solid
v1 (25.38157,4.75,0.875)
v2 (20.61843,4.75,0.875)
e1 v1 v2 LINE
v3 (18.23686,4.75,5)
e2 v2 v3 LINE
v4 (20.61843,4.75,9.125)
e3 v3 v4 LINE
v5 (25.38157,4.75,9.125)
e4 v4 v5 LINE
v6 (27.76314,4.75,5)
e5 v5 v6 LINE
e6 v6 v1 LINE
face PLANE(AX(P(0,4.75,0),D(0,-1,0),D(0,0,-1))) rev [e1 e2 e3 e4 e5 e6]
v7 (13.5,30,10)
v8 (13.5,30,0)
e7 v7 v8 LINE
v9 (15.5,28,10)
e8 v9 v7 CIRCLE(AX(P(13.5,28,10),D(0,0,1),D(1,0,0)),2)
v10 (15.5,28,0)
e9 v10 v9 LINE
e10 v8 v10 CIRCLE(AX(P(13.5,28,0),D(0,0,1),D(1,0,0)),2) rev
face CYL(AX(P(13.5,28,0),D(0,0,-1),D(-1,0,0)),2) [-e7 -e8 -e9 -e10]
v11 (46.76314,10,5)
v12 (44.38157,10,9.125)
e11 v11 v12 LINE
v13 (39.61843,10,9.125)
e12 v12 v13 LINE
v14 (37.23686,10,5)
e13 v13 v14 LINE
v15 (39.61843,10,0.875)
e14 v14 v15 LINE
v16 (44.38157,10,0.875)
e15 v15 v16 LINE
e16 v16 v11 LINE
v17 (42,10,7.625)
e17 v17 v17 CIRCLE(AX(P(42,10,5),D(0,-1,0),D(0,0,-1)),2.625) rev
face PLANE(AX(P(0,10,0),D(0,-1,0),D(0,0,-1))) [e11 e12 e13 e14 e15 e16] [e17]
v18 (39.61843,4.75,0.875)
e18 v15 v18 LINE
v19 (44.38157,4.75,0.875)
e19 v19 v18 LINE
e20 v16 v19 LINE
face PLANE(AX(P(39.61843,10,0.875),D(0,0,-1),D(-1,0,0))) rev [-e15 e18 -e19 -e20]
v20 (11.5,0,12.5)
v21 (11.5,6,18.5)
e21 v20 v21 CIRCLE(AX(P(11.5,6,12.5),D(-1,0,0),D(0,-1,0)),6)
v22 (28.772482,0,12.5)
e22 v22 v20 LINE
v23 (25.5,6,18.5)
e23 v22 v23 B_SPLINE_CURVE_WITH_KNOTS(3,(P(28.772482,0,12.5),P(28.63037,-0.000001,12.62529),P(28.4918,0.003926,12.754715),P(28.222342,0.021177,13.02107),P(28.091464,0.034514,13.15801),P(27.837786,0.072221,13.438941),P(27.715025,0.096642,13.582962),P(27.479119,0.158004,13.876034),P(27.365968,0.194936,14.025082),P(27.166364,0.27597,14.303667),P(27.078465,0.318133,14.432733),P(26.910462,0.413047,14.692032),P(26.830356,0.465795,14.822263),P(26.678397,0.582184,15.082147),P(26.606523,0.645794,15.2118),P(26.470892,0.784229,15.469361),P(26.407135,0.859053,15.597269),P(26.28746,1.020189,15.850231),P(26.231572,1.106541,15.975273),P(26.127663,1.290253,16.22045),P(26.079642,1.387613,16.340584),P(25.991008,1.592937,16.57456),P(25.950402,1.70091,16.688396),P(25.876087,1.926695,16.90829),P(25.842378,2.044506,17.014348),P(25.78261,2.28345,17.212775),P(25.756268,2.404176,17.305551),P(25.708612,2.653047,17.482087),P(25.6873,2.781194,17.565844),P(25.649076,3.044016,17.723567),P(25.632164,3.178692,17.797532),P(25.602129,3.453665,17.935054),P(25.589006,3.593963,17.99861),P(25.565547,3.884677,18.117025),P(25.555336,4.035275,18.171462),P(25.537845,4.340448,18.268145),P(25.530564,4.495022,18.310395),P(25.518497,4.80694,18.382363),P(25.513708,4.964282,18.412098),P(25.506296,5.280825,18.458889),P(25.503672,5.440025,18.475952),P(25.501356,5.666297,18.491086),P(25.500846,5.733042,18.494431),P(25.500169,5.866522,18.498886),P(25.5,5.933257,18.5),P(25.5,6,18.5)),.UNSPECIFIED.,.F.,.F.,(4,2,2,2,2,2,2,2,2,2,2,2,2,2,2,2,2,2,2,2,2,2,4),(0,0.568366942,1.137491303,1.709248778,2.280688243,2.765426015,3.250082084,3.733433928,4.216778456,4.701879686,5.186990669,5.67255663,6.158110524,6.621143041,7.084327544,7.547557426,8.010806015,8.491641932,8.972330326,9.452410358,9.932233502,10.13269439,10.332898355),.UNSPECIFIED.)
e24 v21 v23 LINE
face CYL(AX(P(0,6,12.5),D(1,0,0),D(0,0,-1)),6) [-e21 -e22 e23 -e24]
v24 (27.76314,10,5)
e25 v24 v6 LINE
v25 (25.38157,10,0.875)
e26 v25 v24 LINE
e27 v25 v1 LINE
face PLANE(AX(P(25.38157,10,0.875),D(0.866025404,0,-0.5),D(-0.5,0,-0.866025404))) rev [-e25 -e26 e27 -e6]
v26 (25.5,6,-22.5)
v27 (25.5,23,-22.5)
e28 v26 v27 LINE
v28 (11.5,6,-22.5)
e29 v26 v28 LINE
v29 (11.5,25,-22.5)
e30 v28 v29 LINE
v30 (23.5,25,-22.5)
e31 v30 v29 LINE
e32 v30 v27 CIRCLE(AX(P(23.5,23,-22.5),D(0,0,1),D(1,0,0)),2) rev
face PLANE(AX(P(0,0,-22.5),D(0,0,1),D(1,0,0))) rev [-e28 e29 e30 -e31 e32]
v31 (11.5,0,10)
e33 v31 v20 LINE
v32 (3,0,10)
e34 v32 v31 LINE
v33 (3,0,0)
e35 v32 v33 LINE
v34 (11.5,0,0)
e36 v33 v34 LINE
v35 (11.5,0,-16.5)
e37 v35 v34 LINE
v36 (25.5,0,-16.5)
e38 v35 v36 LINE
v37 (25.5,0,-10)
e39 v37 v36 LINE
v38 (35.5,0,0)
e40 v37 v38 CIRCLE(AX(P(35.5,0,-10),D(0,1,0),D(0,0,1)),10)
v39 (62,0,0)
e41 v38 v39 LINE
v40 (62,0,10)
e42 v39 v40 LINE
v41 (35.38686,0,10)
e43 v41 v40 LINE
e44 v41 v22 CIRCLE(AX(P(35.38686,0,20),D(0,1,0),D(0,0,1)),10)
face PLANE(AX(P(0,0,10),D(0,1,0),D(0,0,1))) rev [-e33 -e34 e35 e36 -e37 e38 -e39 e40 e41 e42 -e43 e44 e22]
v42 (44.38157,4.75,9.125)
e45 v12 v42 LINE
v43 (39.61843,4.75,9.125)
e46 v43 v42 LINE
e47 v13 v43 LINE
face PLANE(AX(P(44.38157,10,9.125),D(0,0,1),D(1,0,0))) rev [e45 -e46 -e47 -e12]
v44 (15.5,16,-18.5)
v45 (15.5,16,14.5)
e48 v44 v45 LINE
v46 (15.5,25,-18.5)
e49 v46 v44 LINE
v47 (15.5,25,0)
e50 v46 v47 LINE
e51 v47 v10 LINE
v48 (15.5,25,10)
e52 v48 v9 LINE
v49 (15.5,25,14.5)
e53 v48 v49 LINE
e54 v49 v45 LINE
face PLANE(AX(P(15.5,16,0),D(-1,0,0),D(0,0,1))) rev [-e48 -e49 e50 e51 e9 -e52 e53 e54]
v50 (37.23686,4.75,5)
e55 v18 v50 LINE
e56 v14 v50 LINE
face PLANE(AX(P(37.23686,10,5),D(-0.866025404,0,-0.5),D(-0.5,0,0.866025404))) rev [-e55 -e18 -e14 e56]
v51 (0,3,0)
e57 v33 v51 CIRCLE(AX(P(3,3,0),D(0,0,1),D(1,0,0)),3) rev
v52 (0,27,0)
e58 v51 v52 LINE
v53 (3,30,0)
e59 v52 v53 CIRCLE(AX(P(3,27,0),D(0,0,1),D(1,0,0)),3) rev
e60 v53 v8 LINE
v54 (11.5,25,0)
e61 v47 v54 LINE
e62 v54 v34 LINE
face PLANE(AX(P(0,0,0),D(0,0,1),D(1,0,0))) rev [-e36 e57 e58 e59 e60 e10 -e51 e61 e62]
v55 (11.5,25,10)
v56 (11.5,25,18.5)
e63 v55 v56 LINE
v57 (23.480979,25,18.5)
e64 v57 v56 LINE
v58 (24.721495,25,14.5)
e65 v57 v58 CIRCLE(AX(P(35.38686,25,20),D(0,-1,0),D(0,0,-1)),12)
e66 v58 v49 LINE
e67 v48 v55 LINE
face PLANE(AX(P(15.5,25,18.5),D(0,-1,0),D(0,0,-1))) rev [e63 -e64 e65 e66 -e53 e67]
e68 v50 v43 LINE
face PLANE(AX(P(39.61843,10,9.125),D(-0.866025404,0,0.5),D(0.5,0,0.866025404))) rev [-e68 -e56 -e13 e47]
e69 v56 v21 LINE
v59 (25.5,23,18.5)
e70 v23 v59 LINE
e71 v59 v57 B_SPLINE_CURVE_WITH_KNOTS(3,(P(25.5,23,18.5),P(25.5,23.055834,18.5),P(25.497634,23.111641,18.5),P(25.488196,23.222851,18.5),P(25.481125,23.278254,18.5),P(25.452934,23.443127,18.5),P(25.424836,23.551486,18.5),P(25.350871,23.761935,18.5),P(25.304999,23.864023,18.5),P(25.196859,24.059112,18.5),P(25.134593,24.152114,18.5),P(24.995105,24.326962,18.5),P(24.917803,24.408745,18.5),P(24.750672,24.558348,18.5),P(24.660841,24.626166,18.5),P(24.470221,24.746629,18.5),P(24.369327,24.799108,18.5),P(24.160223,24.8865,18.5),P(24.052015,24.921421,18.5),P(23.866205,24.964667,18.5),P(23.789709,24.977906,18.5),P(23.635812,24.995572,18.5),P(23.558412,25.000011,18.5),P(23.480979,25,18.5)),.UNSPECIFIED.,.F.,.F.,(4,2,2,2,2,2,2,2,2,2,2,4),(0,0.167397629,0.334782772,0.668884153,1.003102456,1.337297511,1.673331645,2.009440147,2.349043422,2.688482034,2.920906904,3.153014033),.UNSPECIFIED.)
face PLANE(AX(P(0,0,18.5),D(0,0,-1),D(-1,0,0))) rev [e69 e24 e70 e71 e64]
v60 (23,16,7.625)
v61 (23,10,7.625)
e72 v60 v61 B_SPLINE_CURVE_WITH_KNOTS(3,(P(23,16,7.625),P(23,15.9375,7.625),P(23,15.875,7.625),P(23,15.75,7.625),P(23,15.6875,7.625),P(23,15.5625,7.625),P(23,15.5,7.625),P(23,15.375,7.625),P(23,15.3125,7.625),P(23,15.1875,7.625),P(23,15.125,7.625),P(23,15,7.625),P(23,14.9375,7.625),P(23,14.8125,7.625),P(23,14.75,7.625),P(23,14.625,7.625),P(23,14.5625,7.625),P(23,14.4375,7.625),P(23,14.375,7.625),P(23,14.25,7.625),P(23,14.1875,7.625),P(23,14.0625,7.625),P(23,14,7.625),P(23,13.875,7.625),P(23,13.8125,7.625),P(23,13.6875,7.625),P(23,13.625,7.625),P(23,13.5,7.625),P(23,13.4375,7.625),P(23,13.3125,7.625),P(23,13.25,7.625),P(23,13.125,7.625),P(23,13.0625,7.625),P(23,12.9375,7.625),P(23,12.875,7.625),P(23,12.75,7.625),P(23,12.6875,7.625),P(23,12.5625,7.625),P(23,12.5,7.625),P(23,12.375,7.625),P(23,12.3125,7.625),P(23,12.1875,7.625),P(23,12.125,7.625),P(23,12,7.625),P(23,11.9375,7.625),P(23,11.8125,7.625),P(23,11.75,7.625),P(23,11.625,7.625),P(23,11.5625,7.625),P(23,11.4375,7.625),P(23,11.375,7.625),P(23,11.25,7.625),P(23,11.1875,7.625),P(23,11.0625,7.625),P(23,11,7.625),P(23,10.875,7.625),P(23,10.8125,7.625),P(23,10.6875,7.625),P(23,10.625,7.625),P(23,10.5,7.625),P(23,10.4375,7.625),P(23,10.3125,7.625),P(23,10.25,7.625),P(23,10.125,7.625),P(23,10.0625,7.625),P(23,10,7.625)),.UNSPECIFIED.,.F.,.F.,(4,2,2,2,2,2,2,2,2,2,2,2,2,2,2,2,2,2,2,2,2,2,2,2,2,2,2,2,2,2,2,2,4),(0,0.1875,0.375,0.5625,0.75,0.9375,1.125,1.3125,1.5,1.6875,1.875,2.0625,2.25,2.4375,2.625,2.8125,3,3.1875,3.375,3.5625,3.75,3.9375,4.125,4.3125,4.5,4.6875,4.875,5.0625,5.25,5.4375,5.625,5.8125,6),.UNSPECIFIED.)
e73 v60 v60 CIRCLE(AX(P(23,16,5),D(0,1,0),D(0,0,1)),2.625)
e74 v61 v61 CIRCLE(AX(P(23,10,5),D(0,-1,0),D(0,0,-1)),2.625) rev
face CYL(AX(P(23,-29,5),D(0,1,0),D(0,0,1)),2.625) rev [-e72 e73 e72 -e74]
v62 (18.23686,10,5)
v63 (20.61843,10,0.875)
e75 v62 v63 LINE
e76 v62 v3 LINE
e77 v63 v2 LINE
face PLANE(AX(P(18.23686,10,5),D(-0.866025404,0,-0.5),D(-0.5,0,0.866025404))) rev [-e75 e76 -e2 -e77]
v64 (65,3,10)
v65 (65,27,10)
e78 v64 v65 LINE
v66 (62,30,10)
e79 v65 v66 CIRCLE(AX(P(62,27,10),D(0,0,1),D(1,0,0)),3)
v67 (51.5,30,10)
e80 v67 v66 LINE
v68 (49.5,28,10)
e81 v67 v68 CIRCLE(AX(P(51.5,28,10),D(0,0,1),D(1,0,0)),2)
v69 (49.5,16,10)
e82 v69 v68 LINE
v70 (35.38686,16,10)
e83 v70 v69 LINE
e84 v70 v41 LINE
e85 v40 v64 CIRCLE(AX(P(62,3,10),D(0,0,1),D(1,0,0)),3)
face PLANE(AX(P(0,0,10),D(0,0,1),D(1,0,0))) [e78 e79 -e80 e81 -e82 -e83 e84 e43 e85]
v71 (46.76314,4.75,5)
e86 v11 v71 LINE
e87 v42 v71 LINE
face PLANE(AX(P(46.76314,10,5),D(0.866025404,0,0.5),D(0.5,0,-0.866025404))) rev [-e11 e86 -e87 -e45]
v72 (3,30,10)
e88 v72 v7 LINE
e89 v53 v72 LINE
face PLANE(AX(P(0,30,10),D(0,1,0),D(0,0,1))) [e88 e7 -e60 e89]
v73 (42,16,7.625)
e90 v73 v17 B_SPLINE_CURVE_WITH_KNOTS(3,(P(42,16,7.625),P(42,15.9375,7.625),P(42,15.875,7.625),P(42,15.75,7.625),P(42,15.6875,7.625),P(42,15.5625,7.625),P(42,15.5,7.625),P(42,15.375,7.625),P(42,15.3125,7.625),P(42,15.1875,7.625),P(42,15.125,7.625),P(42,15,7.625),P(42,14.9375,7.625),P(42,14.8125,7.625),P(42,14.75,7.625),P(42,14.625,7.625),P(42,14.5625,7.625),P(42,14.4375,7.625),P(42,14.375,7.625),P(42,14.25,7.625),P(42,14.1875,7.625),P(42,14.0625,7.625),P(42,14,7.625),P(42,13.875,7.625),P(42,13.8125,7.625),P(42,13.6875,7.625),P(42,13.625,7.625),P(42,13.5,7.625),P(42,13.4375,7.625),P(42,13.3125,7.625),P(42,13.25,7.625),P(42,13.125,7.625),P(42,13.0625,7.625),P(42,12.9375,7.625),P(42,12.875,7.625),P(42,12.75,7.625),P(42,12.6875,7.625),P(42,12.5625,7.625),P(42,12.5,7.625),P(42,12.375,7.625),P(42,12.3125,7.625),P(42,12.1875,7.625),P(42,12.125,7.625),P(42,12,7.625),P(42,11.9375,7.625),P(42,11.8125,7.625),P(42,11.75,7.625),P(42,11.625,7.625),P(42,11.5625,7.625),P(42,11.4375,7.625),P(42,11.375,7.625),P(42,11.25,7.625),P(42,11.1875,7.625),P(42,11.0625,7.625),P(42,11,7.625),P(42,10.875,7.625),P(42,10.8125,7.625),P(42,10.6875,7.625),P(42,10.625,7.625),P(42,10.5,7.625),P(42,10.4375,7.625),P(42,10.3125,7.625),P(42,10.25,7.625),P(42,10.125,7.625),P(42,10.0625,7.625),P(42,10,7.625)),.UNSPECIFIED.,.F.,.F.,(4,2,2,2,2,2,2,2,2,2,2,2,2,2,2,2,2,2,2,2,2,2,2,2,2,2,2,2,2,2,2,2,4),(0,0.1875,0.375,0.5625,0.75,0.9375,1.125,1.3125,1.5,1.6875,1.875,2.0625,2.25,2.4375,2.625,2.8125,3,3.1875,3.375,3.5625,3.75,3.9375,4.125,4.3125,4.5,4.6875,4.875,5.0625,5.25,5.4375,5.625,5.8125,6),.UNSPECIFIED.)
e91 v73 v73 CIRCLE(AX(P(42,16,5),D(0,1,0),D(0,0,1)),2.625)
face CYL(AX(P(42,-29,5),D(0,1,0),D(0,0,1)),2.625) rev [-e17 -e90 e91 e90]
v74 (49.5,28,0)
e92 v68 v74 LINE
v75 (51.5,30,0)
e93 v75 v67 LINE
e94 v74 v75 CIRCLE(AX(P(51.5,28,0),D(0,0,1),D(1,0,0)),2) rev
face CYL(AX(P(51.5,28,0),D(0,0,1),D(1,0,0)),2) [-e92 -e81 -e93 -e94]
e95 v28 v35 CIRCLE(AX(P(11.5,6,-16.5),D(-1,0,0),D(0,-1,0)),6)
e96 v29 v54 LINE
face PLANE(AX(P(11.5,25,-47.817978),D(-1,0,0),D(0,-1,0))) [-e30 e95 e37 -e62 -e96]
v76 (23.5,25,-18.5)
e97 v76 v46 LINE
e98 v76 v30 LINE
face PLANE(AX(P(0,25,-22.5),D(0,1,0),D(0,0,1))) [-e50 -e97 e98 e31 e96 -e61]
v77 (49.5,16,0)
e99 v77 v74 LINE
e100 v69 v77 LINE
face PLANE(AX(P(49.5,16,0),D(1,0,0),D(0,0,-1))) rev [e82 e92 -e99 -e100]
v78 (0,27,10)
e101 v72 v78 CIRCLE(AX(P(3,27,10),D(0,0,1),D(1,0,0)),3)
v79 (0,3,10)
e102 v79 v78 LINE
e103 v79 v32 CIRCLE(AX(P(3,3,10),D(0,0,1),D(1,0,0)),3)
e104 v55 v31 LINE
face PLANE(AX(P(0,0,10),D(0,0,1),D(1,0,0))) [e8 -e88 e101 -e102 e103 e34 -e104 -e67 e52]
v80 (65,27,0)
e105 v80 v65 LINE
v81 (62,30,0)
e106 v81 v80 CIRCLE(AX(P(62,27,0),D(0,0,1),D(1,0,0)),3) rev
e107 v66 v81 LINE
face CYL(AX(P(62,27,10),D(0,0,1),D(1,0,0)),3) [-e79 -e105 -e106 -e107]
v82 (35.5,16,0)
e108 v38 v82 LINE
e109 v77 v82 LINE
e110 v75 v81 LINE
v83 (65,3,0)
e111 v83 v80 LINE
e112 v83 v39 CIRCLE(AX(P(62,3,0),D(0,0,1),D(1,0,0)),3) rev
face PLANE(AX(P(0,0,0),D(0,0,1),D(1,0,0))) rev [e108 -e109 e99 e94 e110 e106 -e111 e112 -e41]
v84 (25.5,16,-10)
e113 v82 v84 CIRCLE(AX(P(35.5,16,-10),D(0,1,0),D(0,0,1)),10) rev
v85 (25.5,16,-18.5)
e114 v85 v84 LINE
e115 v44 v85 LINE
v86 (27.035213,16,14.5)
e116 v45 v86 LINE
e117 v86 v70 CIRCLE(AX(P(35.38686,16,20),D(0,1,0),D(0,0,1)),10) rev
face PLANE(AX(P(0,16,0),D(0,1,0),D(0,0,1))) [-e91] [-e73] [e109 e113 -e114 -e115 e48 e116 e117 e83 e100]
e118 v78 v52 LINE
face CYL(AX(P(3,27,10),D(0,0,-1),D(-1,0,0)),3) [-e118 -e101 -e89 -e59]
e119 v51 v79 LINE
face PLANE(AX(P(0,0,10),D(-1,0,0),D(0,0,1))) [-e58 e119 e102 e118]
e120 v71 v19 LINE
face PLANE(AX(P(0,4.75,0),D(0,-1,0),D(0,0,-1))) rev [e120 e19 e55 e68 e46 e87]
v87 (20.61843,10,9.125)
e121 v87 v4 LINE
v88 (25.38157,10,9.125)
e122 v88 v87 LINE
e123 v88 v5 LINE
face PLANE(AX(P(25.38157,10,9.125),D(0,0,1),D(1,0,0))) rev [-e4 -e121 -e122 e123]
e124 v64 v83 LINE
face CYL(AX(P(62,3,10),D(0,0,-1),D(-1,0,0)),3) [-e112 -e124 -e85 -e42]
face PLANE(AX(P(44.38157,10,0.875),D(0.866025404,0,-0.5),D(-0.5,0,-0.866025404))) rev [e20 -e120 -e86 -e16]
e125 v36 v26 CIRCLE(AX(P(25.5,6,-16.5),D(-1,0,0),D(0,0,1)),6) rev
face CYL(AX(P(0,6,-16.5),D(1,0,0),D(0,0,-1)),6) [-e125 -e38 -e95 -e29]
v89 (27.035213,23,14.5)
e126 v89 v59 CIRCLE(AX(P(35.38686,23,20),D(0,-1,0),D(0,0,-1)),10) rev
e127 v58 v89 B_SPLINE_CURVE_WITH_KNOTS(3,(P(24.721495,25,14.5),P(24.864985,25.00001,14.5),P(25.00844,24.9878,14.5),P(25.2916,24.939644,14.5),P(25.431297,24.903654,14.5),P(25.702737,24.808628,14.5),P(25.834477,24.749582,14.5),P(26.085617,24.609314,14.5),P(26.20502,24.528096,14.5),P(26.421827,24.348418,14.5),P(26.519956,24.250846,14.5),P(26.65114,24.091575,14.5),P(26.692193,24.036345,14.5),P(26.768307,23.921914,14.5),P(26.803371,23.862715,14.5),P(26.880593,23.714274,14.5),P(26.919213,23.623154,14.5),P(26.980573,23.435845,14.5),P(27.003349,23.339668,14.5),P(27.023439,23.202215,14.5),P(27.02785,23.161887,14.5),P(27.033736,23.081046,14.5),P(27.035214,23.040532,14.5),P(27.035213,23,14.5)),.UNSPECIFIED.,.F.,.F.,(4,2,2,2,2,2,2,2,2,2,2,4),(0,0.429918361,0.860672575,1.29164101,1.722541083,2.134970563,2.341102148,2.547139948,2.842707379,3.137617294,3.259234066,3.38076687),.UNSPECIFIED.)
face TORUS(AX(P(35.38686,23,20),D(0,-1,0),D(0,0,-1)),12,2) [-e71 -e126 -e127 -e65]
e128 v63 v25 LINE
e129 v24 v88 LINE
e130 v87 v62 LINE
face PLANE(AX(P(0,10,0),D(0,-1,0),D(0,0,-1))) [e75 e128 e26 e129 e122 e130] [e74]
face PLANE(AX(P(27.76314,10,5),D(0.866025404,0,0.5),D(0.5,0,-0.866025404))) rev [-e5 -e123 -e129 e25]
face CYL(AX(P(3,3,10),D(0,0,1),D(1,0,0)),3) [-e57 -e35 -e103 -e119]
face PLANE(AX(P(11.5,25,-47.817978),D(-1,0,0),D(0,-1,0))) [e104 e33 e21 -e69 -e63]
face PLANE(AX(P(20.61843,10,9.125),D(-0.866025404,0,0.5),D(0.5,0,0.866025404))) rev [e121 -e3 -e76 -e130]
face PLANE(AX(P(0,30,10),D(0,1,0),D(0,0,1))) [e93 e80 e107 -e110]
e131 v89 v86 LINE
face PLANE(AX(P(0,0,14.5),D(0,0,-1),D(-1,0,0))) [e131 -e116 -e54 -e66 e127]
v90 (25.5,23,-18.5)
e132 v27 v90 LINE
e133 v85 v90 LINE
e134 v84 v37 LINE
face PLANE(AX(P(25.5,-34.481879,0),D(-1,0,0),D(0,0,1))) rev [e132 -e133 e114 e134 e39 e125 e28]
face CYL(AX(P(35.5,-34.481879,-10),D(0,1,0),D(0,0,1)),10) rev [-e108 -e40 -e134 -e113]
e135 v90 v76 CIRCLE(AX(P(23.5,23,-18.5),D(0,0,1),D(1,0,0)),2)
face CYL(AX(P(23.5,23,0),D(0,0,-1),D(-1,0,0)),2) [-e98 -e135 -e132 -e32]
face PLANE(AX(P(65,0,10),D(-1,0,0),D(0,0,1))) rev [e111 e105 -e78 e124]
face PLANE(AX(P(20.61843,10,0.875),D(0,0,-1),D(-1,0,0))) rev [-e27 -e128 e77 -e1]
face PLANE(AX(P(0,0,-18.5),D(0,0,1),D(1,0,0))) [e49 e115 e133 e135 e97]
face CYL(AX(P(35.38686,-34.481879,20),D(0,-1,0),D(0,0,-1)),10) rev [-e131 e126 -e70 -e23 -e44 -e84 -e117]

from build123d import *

# Parameters (mm, degrees)
SKETCH1_W           = 65
SKETCH1_H           = 30
BOSS_EXTRUDE1_DEPTH = 10
SKETCH2_W           = 34
SKETCH2_H           = 10
CUT_EXTRUDE1_DEPTH  = 14
SKETCH4_R           = 2.625
CUT_EXTRUDE3_DEPTH  = 45
FILLET1_R           = 3
SKETCH5_W           = 10
SKETCH5_H           = 4.5
SKETCH5_H_2         = 18.5
BOSS_EXTRUDE2_DEPTH = 16
CUT_EXTRUDE2_DEPTH  = 10
SKETCH6_W           = 10
SKETCH6_H           = 25
BOSS_EXTRUDE3_DEPTH = 4
BOSS_EXTRUDE4_START = -33
SKETCH6_2_W         = 10
SKETCH6_2_H         = 25
BOSS_EXTRUDE4_DEPTH = 4
BOSS_EXTRUDE7_REACH = 84.498
SKETCH7_W           = 4
SKETCH7_H           = 25
FILLET2_R           = 6
FILLET4_START       = 2.3595
FILLET4_DEPTH       = 13.6405
FILLET4_2_DEPTH     = 2.8314
FILLET4_START_2     = 6.0000001
FILLET4_3_DEPTH     = 18.9999999
FILLET4_START_3     = 25.5
FILLET4_4_DEPTH     = 9.886859967
FILLET4_5_DEPTH     = 6.00000009
FILLET7_R           = 2
BOSS_EXTRUDE8_DEPTH = 4.75


with BuildPart() as part:
    # Sketch1 → Boss-Extrude1 (new body)
    with BuildSketch(Plane.XY):
        with Locations((32.5, 15)):
            Rectangle(SKETCH1_W, SKETCH1_H)
    extrude(amount=BOSS_EXTRUDE1_DEPTH)

    # Sketch2 → Cut-Extrude1 (cut)
    with BuildSketch(Plane(origin=(0, 30, 0), x_dir=(1, 0, 0), z_dir=(0, 1, 0))):
        with Locations((32.5, -5)):
            Rectangle(SKETCH2_W, SKETCH2_H)
    extrude(amount=-CUT_EXTRUDE1_DEPTH, mode=Mode.SUBTRACT)

    # Sketch4 → Cut-Extrude3 (cut)
    with BuildSketch(Plane(origin=(0, 16, 0), x_dir=(1, 0, 0), z_dir=(0, 1, 0))):
        with Locations(Location((23, -5, 0), (0, 0, 270))):
            Circle(SKETCH4_R)
        with Locations(Location((42, -5, 0), (0, 0, 270))):
            Circle(SKETCH4_R)
    extrude(amount=-CUT_EXTRUDE3_DEPTH, mode=Mode.SUBTRACT)

    # Fillet1
    fillet1_edges = [part.edges().sort_by_distance(p)[0] for p in [
        (0, 30, 5),
        (0, 0, 5),
        (65, 0, 5),
        (65, 30, 5),
    ]]
    fillet(fillet1_edges, radius=FILLET1_R)

    # Sketch5 → Boss-Extrude2 (add)
    with BuildSketch(Plane(origin=(0, 16, 0), x_dir=(1, 0, 0), z_dir=(0, 1, 0))):
        with Locations((20.5, -12.25)):
            Rectangle(SKETCH5_W, SKETCH5_H)
        with BuildLine():
            Line((25.5, 0), (15.5, 0))
            Line((15.5, 0), (15.5, -10))
            Line((15.5, -10), (25.5, -10))
            Line((25.5, -10), (25.5, -5.80039053))
            ThreePointArc((25.5, -5.80039053), (20.375, -5), (25.5, -4.19960947))
            Line((25.5, -4.19960947), (25.5, 0))
        make_face()
        with Locations((20.5, 9.25)):
            Rectangle(SKETCH5_W, SKETCH5_H_2)
    extrude(amount=-BOSS_EXTRUDE2_DEPTH)

    # Sketch3 → Cut-Extrude2 (cut)
    with BuildSketch(Plane.XZ):
        Polygon((20.61843014, 9.125), (18.236860279, 5), (20.61843014, 0.875), (25.38156986, 0.875), (27.763139721, 5), (25.38156986, 9.125), align=None)
        Polygon((46.763139721, 5), (44.38156986, 9.125), (39.61843014, 9.125), (37.236860279, 5), (39.61843014, 0.875), (44.38156986, 0.875), align=None)
    extrude(amount=-CUT_EXTRUDE2_DEPTH, mode=Mode.SUBTRACT)

    # Sketch6 → Boss-Extrude3 (add)
    with BuildSketch(Plane.XY.offset(14.5)):
        with Locations((20.5, 12.5)):
            Rectangle(SKETCH6_W, SKETCH6_H)
    extrude(amount=BOSS_EXTRUDE3_DEPTH)

    # Sketch6<2> → Boss-Extrude4 (add)
    with BuildSketch(Plane.XY.offset(14.5).offset(BOSS_EXTRUDE4_START)):
        with Locations((20.5, 12.5)):
            Rectangle(SKETCH6_2_W, SKETCH6_2_H)
    extrude(amount=-BOSS_EXTRUDE4_DEPTH)

    # Boss-Extrude7: up to this face of the body (flat: up to its plane)
    boss_extrude7_end = Plane(part.part.faces().sort_by_distance((20.5, 12.5, -22.5))[0])
    # Sketch7 → Boss-Extrude7 (add, up to the picked face)
    with BuildSketch(Plane.XY.offset(18.5), mode=Mode.PRIVATE) as boss_extrude7_sk1:
        with Locations((13.5, 12.5)):
            Rectangle(SKETCH7_W, SKETCH7_H)
    boss_extrude7_tool1 = split(extrude(boss_extrude7_sk1.sketch, amount=-BOSS_EXTRUDE7_REACH, mode=Mode.PRIVATE), bisect_by=boss_extrude7_end, keep=Keep.BOTH, mode=Mode.PRIVATE)
    add(boss_extrude7_tool1.solids().sort_by(Axis((13.5, 12.5, 18.5), (0, 0, -1)))[0])

    # Fillet2
    fillet2_edges = [part.edges().sort_by_distance(p)[0] for p in [
        (18.5, 0, 18.5),
        (18.5, 0, -22.5),
    ]]
    fillet(fillet2_edges, radius=FILLET2_R)

    # Fillet4: read off the stored shape, not the designer's step
    # Fillet4 outline → Fillet4 (add)
    with BuildSketch(Plane(origin=(0, 0, 0), x_dir=(1, 0, 0), z_dir=(0, 1, 0)).offset(FILLET4_START)):
        with BuildLine():
            Line((25.5, -14.5), (27.035213422, -14.5))
            ThreePointArc((27.035213422, -14.5), (30.643443476, -11.196591569), (35.386859967, -10))
            Line((35.386859967, -10), (25.5, -10))
            Line((25.5, -10), (25.5, -14.5))
        make_face()
        with BuildLine():
            ThreePointArc((35.5, 0), (28.428932188, 2.928932188), (25.5, 10))
            Line((25.5, 10), (25.5, 0))
            Line((25.5, 0), (35.5, 0))
        make_face()
    extrude(amount=FILLET4_DEPTH)

    # Fillet4 2 outline → Fillet4 2 (add)
    with BuildSketch(Plane(origin=(0, 0, 0), x_dir=(1, 0, 0), z_dir=(0, 1, 0))):
        with BuildLine():
            ThreePointArc((35.5, 0), (28.428932188, 2.928932188), (25.5, 10))
            Line((25.5, 10), (25.5, 0))
            Line((25.5, 0), (35.5, 0))
        make_face()
    extrude(amount=FILLET4_2_DEPTH)

    # Fillet4 3 outline → Fillet4 3 (add)
    with BuildSketch(Plane(origin=(0, 0, 0), x_dir=(1, 0, 0), z_dir=(0, 1, 0)).offset(FILLET4_START_2)):
        with BuildLine():
            ThreePointArc((25.5, -18.5), (26.050866182, -16.416814258), (27.035213422, -14.5))
            Line((27.035213422, -14.5), (25.5, -14.5))
            Line((25.5, -14.5), (25.5, -18.5))
        make_face()
    extrude(amount=FILLET4_3_DEPTH)

    # Fillet4 4 outline → Fillet4 4 (add)
    with BuildSketch(Plane.YZ.offset(FILLET4_START_3)):
        with BuildLine():
            Line((0, 12.5), (0, 10))
            Line((0, 10), (2.3595, 10))
            Line((2.3595, 10), (2.3595, 14.5))
            Line((2.3595, 14.5), (6.0000001, 14.5))
            Line((6.0000001, 14.5), (6, 18.5))
            ThreePointArc((6, 18.5), (1.757359313, 16.742640687), (0, 12.5))
        make_face()
    extrude(amount=FILLET4_4_DEPTH)

    # Fillet4 5 outline → Fillet4 5 (cut)
    with BuildSketch(Plane(origin=(0, 0, 0), x_dir=(1, 0, 0), z_dir=(0, 1, 0))):
        with BuildLine():
            Line((25.5, -18.5), (25.272425218, -20))
            Line((25.272425218, -20), (35.386859967, -20))
            Line((35.386859967, -20), (35.386859967, -10))
            ThreePointArc((35.386859967, -10), (28.867657561, -12.417124556), (25.5, -18.5))
        make_face()
    extrude(amount=FILLET4_5_DEPTH, mode=Mode.SUBTRACT)

    # Fillet7
    fillet7_edges = [part.edges().sort_by_distance(p)[0] for p in [
        (25.5, 25, -20.5),
        (15.5, 30, 5),
        (49.5, 30, 5),
        (26.050866182, 25, 16.416814258),
    ]]
    fillet(fillet7_edges, radius=FILLET7_R)

    # Sketch3<2> → Boss-Extrude8 (add)
    with BuildSketch(Plane.XZ):
        Polygon((20.61843014, 9.125), (18.236860279, 5), (20.61843014, 0.875), (25.38156986, 0.875), (27.763139721, 5), (25.38156986, 9.125), align=None)
        Polygon((46.763139721, 5), (44.38156986, 9.125), (39.61843014, 9.125), (37.236860279, 5), (39.61843014, 0.875), (44.38156986, 0.875), align=None)
    extrude(amount=-BOSS_EXTRUDE8_DEPTH)


solid = part.part
